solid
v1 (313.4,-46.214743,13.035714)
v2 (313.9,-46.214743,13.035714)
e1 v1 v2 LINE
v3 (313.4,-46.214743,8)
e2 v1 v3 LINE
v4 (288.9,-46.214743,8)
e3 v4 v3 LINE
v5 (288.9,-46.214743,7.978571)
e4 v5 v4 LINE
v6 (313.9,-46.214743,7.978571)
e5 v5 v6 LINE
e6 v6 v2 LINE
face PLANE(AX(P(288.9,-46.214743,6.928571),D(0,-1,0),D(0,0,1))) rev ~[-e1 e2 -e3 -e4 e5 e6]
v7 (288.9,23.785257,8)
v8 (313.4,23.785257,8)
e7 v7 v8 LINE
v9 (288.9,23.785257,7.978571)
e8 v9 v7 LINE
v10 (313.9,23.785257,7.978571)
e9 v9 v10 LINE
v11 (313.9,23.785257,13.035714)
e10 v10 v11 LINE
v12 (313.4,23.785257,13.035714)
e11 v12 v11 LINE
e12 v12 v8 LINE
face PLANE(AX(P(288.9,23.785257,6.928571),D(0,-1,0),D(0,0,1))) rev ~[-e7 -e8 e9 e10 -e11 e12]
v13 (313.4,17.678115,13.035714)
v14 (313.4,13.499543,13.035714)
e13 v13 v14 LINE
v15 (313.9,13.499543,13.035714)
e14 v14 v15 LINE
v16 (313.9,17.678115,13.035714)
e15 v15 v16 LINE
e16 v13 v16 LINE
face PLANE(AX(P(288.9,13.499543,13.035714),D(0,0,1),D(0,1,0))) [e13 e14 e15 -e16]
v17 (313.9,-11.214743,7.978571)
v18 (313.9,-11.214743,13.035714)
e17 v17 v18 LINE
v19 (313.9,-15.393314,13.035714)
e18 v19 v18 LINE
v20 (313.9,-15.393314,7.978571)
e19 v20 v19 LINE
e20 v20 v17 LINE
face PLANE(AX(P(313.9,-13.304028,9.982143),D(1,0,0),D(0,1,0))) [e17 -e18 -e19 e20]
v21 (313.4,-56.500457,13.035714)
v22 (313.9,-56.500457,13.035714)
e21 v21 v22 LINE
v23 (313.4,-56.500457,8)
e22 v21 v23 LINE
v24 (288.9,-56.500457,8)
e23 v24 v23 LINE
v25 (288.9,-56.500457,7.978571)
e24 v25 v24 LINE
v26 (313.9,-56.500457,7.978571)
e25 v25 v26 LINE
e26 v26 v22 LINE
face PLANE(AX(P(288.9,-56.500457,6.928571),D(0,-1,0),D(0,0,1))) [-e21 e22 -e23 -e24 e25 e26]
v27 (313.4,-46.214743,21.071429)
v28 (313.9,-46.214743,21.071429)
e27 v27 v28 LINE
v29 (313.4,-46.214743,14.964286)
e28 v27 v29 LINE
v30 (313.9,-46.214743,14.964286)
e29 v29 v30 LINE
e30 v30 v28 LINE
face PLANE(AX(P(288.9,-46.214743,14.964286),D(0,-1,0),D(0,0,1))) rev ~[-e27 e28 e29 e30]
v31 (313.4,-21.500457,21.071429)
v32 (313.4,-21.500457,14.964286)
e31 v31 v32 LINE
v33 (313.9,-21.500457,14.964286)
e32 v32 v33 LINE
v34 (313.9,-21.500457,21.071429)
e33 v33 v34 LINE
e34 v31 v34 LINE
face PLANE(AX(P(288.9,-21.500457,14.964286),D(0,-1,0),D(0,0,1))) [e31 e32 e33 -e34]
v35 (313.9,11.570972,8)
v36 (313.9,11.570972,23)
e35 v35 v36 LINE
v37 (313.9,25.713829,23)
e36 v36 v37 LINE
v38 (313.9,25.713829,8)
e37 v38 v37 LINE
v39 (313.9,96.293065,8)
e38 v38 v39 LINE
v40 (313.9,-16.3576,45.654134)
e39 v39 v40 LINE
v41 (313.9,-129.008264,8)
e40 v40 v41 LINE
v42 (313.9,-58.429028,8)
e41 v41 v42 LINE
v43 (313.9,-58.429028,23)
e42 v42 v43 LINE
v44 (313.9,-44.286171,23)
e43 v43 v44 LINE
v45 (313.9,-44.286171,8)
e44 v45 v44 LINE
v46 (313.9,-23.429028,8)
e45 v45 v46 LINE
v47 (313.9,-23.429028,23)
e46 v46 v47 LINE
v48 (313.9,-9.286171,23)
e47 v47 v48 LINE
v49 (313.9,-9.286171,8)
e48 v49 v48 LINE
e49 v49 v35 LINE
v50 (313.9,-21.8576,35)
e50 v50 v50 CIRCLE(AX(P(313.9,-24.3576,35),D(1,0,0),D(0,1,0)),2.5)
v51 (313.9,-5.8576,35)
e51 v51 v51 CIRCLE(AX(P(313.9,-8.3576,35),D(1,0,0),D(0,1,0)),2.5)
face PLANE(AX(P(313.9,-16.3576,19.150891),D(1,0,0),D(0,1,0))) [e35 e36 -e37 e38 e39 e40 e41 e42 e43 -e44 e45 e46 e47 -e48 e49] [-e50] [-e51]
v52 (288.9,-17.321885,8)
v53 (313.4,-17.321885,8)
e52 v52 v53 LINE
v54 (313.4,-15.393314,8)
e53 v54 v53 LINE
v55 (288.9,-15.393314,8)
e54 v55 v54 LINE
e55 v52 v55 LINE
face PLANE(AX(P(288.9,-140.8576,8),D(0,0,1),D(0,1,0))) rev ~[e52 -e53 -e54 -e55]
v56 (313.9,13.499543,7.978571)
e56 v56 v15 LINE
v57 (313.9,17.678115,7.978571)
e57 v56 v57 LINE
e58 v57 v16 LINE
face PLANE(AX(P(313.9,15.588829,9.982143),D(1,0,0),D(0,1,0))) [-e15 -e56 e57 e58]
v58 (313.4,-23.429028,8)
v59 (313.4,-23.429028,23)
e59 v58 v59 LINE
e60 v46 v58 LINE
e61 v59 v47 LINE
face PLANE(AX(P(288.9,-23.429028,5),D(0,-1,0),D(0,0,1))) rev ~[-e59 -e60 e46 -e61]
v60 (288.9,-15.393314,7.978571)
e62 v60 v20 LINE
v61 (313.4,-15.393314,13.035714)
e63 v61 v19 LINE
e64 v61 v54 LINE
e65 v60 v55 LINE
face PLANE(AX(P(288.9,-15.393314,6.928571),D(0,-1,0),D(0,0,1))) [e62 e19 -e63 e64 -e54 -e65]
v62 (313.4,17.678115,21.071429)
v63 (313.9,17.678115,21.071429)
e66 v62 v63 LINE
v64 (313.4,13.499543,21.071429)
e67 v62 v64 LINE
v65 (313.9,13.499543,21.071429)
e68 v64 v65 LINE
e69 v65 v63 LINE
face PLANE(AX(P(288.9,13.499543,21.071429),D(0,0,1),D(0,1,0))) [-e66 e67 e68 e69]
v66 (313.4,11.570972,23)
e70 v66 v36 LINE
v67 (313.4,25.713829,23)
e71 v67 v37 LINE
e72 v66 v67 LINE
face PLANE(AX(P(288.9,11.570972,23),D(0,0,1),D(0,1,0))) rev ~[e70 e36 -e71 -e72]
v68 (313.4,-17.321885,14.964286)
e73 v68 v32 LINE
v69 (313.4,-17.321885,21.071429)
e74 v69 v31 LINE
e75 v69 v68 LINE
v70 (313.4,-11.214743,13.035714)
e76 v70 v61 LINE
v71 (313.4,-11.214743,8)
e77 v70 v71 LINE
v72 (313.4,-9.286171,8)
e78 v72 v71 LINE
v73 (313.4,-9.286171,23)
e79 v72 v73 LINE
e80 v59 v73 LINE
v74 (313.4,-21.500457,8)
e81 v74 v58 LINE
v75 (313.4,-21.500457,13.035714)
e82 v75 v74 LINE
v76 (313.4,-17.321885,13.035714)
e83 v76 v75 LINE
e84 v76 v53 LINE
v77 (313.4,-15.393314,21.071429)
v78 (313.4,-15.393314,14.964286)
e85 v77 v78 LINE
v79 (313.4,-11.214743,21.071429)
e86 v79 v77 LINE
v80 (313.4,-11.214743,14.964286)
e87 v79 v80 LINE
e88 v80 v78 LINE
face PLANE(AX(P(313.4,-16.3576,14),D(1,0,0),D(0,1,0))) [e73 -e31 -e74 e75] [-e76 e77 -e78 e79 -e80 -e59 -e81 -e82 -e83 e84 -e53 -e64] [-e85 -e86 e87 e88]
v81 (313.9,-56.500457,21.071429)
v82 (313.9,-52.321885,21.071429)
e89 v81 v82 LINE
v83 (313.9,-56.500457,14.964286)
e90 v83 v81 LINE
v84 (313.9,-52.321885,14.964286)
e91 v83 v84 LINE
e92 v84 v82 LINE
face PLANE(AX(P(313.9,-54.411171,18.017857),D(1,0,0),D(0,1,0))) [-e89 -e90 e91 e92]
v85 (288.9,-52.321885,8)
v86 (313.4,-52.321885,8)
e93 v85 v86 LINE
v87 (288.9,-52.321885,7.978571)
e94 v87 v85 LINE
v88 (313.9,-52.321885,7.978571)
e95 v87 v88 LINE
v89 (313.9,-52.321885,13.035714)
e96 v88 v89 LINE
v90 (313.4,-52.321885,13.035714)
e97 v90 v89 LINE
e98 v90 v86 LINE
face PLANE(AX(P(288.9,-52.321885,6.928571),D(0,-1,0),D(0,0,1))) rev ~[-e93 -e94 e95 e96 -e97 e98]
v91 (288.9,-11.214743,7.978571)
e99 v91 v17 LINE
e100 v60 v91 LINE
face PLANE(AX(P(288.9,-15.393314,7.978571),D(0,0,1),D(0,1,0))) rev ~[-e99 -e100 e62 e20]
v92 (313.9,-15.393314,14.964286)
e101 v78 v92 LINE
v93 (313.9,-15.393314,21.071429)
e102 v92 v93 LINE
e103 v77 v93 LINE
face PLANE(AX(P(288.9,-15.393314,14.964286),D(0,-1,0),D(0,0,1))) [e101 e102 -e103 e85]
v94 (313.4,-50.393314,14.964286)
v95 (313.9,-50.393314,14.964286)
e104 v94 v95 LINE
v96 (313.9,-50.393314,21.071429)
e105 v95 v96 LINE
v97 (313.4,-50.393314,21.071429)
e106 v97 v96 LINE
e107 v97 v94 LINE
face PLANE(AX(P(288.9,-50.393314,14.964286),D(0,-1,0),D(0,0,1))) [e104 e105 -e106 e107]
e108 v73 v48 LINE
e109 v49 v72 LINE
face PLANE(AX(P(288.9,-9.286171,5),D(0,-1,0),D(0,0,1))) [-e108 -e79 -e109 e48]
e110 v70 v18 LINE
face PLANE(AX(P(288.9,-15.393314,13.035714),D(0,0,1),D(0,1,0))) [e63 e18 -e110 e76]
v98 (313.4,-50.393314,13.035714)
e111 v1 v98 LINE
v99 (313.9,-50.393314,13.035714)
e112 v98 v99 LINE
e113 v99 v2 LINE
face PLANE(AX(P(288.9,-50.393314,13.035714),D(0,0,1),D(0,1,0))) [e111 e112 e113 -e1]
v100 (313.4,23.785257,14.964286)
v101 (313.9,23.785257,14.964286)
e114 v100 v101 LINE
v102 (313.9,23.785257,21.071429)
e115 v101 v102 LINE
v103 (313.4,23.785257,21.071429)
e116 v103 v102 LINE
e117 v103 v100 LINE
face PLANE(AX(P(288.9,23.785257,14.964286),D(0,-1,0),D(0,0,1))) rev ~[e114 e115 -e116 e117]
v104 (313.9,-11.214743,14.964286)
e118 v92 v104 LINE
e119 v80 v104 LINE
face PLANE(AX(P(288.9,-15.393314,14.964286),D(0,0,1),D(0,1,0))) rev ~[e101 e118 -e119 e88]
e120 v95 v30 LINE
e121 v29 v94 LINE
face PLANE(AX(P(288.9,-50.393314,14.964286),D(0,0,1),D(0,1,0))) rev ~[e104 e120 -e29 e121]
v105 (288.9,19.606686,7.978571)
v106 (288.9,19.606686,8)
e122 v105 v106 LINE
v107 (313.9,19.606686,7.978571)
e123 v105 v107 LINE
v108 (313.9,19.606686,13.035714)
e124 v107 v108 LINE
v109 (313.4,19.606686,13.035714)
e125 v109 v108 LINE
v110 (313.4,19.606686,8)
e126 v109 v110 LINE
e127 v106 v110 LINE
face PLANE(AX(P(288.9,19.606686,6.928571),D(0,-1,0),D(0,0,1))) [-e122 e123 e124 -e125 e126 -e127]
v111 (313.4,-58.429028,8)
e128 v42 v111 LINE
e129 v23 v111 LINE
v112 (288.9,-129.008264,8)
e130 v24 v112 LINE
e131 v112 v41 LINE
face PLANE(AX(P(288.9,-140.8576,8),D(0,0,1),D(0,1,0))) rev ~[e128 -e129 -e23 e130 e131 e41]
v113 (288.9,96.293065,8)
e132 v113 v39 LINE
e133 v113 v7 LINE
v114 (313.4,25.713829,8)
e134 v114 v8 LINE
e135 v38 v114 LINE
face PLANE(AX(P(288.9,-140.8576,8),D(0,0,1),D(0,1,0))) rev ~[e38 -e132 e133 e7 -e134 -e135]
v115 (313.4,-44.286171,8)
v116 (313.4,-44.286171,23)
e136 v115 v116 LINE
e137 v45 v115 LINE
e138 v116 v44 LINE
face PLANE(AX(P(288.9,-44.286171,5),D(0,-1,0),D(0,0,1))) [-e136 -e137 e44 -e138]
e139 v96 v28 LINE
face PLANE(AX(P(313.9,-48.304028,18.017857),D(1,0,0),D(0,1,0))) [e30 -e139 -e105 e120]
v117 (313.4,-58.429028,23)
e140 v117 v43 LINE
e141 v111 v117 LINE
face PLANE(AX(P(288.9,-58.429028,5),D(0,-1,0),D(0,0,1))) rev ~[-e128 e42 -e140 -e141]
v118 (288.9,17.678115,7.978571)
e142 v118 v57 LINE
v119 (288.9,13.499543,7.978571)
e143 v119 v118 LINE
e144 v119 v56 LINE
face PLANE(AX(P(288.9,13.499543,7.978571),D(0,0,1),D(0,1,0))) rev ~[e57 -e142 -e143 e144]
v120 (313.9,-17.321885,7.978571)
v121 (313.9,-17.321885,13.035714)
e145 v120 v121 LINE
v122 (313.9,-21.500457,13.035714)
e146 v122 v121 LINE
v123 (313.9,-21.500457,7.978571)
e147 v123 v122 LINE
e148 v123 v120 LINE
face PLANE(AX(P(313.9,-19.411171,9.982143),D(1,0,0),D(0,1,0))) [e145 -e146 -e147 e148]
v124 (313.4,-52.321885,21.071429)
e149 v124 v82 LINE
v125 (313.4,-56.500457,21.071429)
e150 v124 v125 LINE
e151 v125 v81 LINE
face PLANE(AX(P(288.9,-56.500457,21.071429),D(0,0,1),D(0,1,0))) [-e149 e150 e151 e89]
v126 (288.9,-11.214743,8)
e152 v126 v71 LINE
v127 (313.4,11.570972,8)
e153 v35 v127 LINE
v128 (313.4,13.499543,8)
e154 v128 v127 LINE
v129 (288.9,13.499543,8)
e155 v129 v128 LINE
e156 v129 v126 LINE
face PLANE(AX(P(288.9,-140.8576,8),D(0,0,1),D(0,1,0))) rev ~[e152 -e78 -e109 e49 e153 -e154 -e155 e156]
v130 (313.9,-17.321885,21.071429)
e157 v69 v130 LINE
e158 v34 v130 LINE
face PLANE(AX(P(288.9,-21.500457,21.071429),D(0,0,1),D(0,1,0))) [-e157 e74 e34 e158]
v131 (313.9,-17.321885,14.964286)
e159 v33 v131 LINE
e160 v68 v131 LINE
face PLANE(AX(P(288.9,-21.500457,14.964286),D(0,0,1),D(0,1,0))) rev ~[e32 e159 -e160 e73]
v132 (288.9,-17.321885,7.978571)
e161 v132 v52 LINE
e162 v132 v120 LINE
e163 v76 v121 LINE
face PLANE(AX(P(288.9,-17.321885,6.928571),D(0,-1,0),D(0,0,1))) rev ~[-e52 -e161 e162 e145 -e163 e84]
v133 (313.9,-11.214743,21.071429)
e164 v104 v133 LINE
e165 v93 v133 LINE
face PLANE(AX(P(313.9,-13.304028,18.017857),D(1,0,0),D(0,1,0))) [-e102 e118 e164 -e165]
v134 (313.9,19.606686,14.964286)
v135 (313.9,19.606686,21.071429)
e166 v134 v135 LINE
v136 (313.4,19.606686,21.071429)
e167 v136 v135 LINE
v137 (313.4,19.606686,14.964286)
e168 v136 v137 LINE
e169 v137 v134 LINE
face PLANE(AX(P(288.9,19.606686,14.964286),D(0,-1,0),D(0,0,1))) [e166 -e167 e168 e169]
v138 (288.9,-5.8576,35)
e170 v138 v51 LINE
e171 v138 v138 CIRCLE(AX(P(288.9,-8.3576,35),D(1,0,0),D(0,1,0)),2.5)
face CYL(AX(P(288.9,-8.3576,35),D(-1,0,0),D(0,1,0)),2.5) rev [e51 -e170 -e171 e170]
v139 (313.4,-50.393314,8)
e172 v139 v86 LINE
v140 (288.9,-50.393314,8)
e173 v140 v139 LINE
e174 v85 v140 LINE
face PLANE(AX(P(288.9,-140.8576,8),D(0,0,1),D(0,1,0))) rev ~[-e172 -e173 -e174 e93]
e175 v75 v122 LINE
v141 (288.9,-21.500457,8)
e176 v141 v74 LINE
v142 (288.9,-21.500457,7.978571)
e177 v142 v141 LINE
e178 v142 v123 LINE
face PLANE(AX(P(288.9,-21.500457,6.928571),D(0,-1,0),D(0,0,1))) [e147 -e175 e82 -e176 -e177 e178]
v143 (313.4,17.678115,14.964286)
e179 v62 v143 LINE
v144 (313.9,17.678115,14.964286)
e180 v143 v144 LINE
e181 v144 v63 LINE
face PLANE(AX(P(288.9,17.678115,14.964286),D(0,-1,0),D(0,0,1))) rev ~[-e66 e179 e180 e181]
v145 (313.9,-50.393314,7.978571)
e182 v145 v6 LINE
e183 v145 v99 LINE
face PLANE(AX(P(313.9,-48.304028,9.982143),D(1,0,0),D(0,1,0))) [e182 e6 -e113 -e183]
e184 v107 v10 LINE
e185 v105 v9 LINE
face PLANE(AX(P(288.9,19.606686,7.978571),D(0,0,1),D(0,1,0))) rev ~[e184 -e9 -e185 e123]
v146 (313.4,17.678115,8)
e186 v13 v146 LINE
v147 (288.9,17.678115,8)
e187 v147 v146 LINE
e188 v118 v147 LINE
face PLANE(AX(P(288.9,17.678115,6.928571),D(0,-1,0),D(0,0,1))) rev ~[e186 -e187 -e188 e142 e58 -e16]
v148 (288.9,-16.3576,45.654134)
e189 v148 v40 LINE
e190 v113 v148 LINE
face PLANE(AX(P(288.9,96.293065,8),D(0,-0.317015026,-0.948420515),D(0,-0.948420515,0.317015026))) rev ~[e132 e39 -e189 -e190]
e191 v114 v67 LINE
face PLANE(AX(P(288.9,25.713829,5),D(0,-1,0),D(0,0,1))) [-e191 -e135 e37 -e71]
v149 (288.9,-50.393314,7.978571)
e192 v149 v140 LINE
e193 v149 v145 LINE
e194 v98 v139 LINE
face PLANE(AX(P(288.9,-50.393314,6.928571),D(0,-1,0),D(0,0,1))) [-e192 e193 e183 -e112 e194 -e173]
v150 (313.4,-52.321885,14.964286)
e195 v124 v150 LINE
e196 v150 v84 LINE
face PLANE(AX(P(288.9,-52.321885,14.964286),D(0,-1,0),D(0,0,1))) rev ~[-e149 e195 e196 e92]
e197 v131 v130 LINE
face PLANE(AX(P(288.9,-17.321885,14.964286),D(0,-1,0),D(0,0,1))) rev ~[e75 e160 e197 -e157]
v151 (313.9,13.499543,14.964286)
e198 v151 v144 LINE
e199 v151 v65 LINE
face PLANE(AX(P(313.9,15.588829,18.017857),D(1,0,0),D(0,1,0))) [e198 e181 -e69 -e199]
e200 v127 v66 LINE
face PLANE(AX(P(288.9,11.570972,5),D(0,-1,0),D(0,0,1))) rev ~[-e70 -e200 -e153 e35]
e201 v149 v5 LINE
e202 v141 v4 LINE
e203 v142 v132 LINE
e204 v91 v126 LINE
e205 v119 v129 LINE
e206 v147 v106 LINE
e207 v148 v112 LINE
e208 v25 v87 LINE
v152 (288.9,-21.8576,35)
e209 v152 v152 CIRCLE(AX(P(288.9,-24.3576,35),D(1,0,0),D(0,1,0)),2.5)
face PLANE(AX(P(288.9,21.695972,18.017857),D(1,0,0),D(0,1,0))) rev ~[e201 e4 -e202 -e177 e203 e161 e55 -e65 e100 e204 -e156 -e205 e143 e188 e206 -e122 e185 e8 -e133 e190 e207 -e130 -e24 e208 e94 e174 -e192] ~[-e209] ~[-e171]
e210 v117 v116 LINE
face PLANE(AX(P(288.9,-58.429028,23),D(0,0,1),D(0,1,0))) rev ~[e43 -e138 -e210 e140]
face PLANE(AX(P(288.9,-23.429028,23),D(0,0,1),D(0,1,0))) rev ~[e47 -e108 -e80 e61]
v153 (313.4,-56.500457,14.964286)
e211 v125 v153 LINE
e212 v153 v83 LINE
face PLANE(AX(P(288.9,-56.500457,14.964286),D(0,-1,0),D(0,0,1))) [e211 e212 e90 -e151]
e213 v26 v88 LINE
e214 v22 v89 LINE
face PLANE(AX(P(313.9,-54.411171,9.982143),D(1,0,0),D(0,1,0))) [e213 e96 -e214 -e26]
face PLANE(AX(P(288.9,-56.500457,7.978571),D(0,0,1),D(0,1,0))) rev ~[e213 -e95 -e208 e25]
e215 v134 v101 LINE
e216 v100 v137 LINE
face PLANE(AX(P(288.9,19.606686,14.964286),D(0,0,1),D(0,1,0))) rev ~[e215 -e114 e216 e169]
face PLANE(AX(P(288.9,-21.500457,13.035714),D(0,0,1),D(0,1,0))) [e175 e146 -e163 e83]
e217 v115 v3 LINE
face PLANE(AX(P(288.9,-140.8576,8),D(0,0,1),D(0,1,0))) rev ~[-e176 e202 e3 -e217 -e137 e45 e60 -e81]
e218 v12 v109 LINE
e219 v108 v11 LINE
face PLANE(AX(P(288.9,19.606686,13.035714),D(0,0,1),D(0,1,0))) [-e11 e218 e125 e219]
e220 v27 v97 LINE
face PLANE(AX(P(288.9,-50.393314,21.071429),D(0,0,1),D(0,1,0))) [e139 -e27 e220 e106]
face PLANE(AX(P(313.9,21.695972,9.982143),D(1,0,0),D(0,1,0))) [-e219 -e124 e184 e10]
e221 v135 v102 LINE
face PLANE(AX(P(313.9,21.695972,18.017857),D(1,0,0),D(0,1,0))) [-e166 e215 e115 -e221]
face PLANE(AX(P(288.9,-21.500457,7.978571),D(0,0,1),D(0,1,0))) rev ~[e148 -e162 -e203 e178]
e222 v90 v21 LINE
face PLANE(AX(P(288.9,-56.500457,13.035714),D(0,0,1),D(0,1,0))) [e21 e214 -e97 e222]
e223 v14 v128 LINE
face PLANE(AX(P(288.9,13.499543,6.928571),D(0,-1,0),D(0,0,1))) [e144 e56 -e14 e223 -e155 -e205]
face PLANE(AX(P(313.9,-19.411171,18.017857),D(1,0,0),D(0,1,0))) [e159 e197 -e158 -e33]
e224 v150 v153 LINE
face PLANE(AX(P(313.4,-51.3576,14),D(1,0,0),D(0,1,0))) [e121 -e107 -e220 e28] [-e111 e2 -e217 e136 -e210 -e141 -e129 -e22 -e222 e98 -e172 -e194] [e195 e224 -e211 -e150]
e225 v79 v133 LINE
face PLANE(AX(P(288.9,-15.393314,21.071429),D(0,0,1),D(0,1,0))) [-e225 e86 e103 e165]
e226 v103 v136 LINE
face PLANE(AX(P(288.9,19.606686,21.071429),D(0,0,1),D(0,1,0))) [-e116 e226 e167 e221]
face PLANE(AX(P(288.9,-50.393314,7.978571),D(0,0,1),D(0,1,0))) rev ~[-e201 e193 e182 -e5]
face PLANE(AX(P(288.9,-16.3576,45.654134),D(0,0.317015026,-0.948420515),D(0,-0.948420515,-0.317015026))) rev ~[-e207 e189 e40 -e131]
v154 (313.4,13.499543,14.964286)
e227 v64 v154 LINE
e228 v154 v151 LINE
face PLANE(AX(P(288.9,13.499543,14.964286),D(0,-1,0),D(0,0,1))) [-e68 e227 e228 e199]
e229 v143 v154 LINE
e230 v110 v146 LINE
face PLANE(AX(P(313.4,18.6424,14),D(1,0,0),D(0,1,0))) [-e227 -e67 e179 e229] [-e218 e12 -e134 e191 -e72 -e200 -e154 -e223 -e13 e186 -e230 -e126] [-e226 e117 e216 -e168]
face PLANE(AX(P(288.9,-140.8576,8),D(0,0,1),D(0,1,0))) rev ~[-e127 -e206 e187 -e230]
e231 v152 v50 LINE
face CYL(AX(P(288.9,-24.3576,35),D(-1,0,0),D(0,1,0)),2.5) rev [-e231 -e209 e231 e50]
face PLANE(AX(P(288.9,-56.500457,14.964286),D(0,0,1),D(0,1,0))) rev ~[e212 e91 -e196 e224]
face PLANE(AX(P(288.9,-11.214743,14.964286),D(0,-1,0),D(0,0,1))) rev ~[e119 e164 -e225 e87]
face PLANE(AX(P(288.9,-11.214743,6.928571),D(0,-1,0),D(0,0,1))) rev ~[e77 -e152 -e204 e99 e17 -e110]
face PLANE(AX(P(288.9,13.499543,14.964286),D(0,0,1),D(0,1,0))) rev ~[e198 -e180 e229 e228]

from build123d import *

# Parameters (mm, degrees)
F1_DEPTH  = 8
F3_DEPTH  = 621.7
F4_DEPTH  = 5.5
F7_DEPTH  = 5.5
F9_DEPTH  = 5.5
F11_DEPTH = 5.5
F13_DEPTH = 5.5
F15_DEPTH = 5.5
F17_DEPTH = 308.2
F18_DEPTH = 24
F20_DEPTH = 244.2
F21_DEPTH = 30.35
F22_R     = 2.5
F23_DEPTH = 0.5
F24_R     = 2.5
F25_DEPTH = 0.5
F26_R     = 2.5
F27_DEPTH = 0.5
F28_R     = 2.5
F29_DEPTH = 0.5
F30_W     = 14.1428571429
F30_H     = 18
F30_W_2   = 4.1785714286
F30_H_2   = 6.1071428571
F31_DEPTH = 0.5
F32_DEPTH = 25
F34_DEPTH = 8
F35_DEPTH = 0.5
F36_W     = 4.1785714286
F36_H     = 6.1071428571
F36_H_2   = 5.0357142857
F37_DEPTH = 24.5
F38_DEPTH = 25
F39_DEPTH = 1.05


# Not quite as in the source:
# - a feature of the source that left no trace in its solid (it failed there, or was rolled back) is left out


with BuildPart() as f1:
    # F0 (on Top) → F1 (new body)
    with BuildSketch(Plane.XY):
        Polygon((-327.3, 108.1424002851), (-327.3, -140.8575997149), (-102.6, -140.8575997149), (-102.6, -170.8575997149), (0, -170.8575997149), (0, -140.8575997149), (288.9, -140.8575997149), (288.9, 108.1424002851), (0, 108.1424002851), (0, 138.1424002851), (-102.6, 128.6424002851), (-102.6, 108.1424002851), align=None)
    extrude(amount=F1_DEPTH)

    # F2 (on face) → F3 (join)
    with BuildSketch(Plane.YZ.offset(288.9)):
        Polygon((-16.3575997149, 51.4532495908), (-146.3575997149, 8), (-140.8575997149, 8), (108.1424002851, 8), (113.6424002851, 8), align=None)
    extrude(amount=-F3_DEPTH)

    # F2 (on face) → F4 (join)
    with BuildSketch(Plane.YZ.offset(288.9)):
        Polygon((-16.3575997149, 51.4532495908), (-146.3575997149, 8), (113.6424002851, 8), align=None)
    extrude(amount=F4_DEPTH)

    # F5 (on face) → F7 (join)
    with BuildSketch(Plane.XZ.offset(170.8575997149)):
        Polygon((-51.3, 62.75), (-108.1, 8), (5.5, 8), align=None)
    extrude(amount=F7_DEPTH)

    # F8 (on face) → F9 (cut)
    with BuildSketch(Plane(origin=(-13.187163576, 142.4213666207, 0), x_dir=(-0.9957406741, -0.0921982106, 0), z_dir=(-0.0921982106, 0.9957406741, 0))):
        Polygon((91.8565413643, 4.3927081219), (38.2758658123, 55.8195932448), (-15.3048097397, 4.3927081219), align=None)
    extrude(amount=-F9_DEPTH, mode=Mode.SUBTRACT)

    # F10 (on face) → F11 (cut)
    with BuildSketch(Plane(origin=(-332.8, 0, 0), x_dir=(0, -1, 0), z_dir=(-1, 0, 0))):
        Polygon((144.6140170728, 2.7836871671), (16.3575997149, 45.6541342062), (-111.8988176431, 2.7836871671), align=None)
    extrude(amount=-F11_DEPTH, mode=Mode.SUBTRACT)

    # F12 (on face) → F13 (cut)
    with BuildSketch(Plane.YZ.offset(294.4)):
        Polygon((111.8988176431, 2.7836871671), (-16.3575997149, 45.6541342062), (-144.6140170728, 2.7836871671), align=None)
    extrude(amount=-F13_DEPTH, mode=Mode.SUBTRACT)

    # F14 (on face) → F15 (cut)
    with BuildSketch(Plane.XZ.offset(176.3575997149)):
        Polygon((1.6830285492, 4.0401099834), (-51.3, 55.1108989459), (-104.2830285492, 4.0401099834), align=None)
    extrude(amount=-F15_DEPTH, mode=Mode.SUBTRACT)

    # F16 (on face) → F17 (join)
    with BuildSketch(Plane.YZ.offset(294.4)):
        Polygon((-37.9123742622, 48.4659791319), (-36.6443145321, 44.6722981882), (-16.3575997149, 51.4532495908), (3.9291151024, 44.6722981882), (5.1971748325, 48.4659791319), (-16.3575997149, 55.670786811), align=None)
    extrude(amount=-F17_DEPTH)

    # F16 (on face) → F18 (cut)
    with BuildSketch(Plane.YZ.offset(294.4)):
        Polygon((-37.9123742622, 48.4659791319), (-36.6443145321, 44.6722981882), (-16.3575997149, 51.4532495908), (3.9291151024, 44.6722981882), (5.1971748325, 48.4659791319), (-16.3575997149, 55.670786811), align=None)
    extrude(amount=-F18_DEPTH, mode=Mode.SUBTRACT)

    # F19 (on face) → F20 (join)
    with BuildSketch(Plane(origin=(-332.8, 0, 0), x_dir=(0, -1, 0), z_dir=(-1, 0, 0))):
        Polygon((-5.1971748325, 48.4659791319), (-3.9291151024, 44.6722981882), (16.3575997149, 51.4532495908), (36.6443145321, 44.6722981882), (37.9123742622, 48.4659791319), (16.3575997149, 55.670786811), align=None)
    extrude(amount=-F20_DEPTH)

    # F19 (on face) → F21 (cut)
    with BuildSketch(Plane(origin=(-332.8, 0, 0), x_dir=(0, -1, 0), z_dir=(-1, 0, 0))):
        Polygon((-5.1971748325, 48.4659791319), (-3.9291151024, 44.6722981882), (16.3575997149, 51.4532495908), (36.6443145321, 44.6722981882), (37.9123742622, 48.4659791319), (16.3575997149, 55.670786811), align=None)
    extrude(amount=-F21_DEPTH, mode=Mode.SUBTRACT)

    # F22 (on face) → F23 (cut)
    with BuildSketch(Plane(origin=(-327.3, 0, 0), x_dir=(0, -1, 0), z_dir=(-1, 0, 0))):
        with Locations((8.3575997149, 35)):
            Circle(F22_R)
        with Locations((24.3575997149, 35)):
            Circle(F22_R)
    extrude(amount=-F23_DEPTH, mode=Mode.SUBTRACT)

    # F24 (on face) → F25 (cut)
    with BuildSketch(Plane.YZ.offset(288.9)):
        with Locations((-24.3575997149, 35)):
            Circle(F24_R)
        with Locations((-8.3575997149, 35)):
            Circle(F24_R)
    extrude(amount=-F25_DEPTH, mode=Mode.SUBTRACT)

    # F26 (on face) → F27 (cut)
    with BuildSketch(Plane.XZ.offset(170.8575997149)):
        with Locations((-59.3, 35)):
            Circle(F26_R)
        with Locations((-43.3, 35)):
            Circle(F26_R)
    extrude(amount=-F27_DEPTH, mode=Mode.SUBTRACT)

    # F28 (on face) → F29 (cut)
    with BuildSketch(Plane(origin=(-12.6822332802, 136.9681194259, 0), x_dir=(-0.9957406741, -0.0921982106, 0), z_dir=(-0.0921982106, 0.9957406741, 0))):
        with Locations((30.7829559704, 35)):
            Circle(F28_R)
        with Locations((46.7829559704, 35)):
            Circle(F28_R)
    extrude(amount=-F29_DEPTH, mode=Mode.SUBTRACT)

    # F30 (on face) → F31 (cut)
    with BuildSketch(Plane.YZ.offset(288.9)):
        with Locations((-16.3575997149, 14)):
            Rectangle(F30_W, F30_H)
        with Locations((-19.4111711434, 9.9821428571)):
            Rectangle(F30_W_2, F30_H_2, mode=Mode.SUBTRACT)
        with Locations((-13.3040282863, 9.9821428571)):
            Rectangle(F30_W_2, F30_H_2, mode=Mode.SUBTRACT)
        with Locations((-19.4111711434, 18.0178571429)):
            Rectangle(F30_W_2, F30_H_2, mode=Mode.SUBTRACT)
        with Locations((-13.3040282863, 18.0178571429)):
            Rectangle(F30_W_2, F30_H_2, mode=Mode.SUBTRACT)
        with Locations((18.6424002851, 14)):
            Rectangle(F30_W, F30_H)
        with Locations((15.5888288566, 9.9821428571)):
            Rectangle(F30_W_2, F30_H_2, mode=Mode.SUBTRACT)
        with Locations((21.6959717137, 9.9821428571)):
            Rectangle(F30_W_2, F30_H_2, mode=Mode.SUBTRACT)
        with Locations((15.5888288566, 18.0178571429)):
            Rectangle(F30_W_2, F30_H_2, mode=Mode.SUBTRACT)
        with Locations((21.6959717137, 18.0178571429)):
            Rectangle(F30_W_2, F30_H_2, mode=Mode.SUBTRACT)
        with Locations((-51.3575997149, 14)):
            Rectangle(F30_W, F30_H)
        with Locations((-54.4111711434, 9.9821428571)):
            Rectangle(F30_W_2, F30_H_2, mode=Mode.SUBTRACT)
        with Locations((-48.3040282863, 9.9821428571)):
            Rectangle(F30_W_2, F30_H_2, mode=Mode.SUBTRACT)
        with Locations((-54.4111711434, 18.0178571429)):
            Rectangle(F30_W_2, F30_H_2, mode=Mode.SUBTRACT)
        with Locations((-48.3040282863, 18.0178571429)):
            Rectangle(F30_W_2, F30_H_2, mode=Mode.SUBTRACT)
    extrude(amount=-F31_DEPTH, mode=Mode.SUBTRACT)


with BuildPart() as f32:
    # F32 (new): faces of the model
    f32_faces = [f1.part.faces().sort_by_distance(p)[0] for p in [
        (288.9, -16.3575997149, 2.5315074555),
        (288.4, -51.3575997149, 14),
        (288.4, -16.3575997149, 14),
        (288.4, 18.6424002851, 14),
    ]]
    extrude(f32_faces, amount=F32_DEPTH)

    # F34 (cut): a face of the model
    f34_faces = [f32.faces().sort_by_distance(p)[0] for p in [
        (301.4, -16.3575997149, 0),
    ]]
    extrude(f34_faces, amount=-F34_DEPTH, mode=Mode.SUBTRACT)

    # F35 (cut): faces of the model
    f35_faces = [f32.faces().sort_by_distance(p)[0] for p in [
        (288.4, 18.6424002851, 14),
        (288.4, -16.3575997149, 14),
        (288.4, -51.3575997149, 14),
    ]]
    extrude(f35_faces, amount=-F35_DEPTH, mode=Mode.SUBTRACT)

    # F36 (on face) → F37 (join)
    with BuildSketch(Plane(origin=(288.9, 0, 0), x_dir=(0, -1, 0), z_dir=(-1, 0, 0))):
        Polygon((61.9918890297, 25.6764385849), (-32.9998731613, 25.6764385849), (-32.9998731613, 8), (-23.785257428, 8), (-23.785257428, 13.0357142857), (-19.6066859994, 13.0357142857), (-19.6066859994, 8), (-17.6781145709, 8), (-17.6781145709, 13.0357142857), (-13.4995431423, 13.0357142857), (-13.4995431423, 8), (11.214742572, 8), (11.214742572, 13.0357142857), (15.3933140006, 13.0357142857), (15.3933140006, 8), (17.3218854291, 8), (17.3218854291, 13.0357142857), (21.5004568577, 13.0357142857), (21.5004568577, 8), (46.214742572, 8), (46.214742572, 13.0357142857), (50.3933140006, 13.0357142857), (50.3933140006, 8), (52.3218854291, 8), (52.3218854291, 13.0357142857), (56.5004568577, 13.0357142857), (56.5004568577, 8), (61.9918890297, 8), align=None)
        with Locations((-21.6959717137, 18.0178571429)):
            Rectangle(F36_W, F36_H, mode=Mode.SUBTRACT)
        with Locations((-15.5888288566, 18.0178571429)):
            Rectangle(F36_W, F36_H, mode=Mode.SUBTRACT)
        with Locations((13.3040282863, 18.0178571429)):
            Rectangle(F36_W, F36_H, mode=Mode.SUBTRACT)
        with Locations((19.4111711434, 18.0178571429)):
            Rectangle(F36_W, F36_H, mode=Mode.SUBTRACT)
        with Locations((48.3040282863, 18.0178571429)):
            Rectangle(F36_W, F36_H, mode=Mode.SUBTRACT)
        with Locations((54.4111711434, 18.0178571429)):
            Rectangle(F36_W, F36_H, mode=Mode.SUBTRACT)
        with Locations((-21.6959717137, 18.0178571429)):
            Rectangle(F36_W, F36_H)
        with Locations((-15.5888288566, 18.0178571429)):
            Rectangle(F36_W, F36_H)
        with Locations((-15.5888288566, 10.5178571429)):
            Rectangle(F36_W, F36_H_2)
        with Locations((-21.6959717137, 10.5178571429)):
            Rectangle(F36_W, F36_H_2)
        with Locations((13.3040282863, 18.0178571429)):
            Rectangle(F36_W, F36_H)
        with Locations((19.4111711434, 18.0178571429)):
            Rectangle(F36_W, F36_H)
        with Locations((19.4111711434, 10.5178571429)):
            Rectangle(F36_W, F36_H_2)
        with Locations((13.3040282863, 10.5178571429)):
            Rectangle(F36_W, F36_H_2)
        with Locations((48.3040282863, 18.0178571429)):
            Rectangle(F36_W, F36_H)
        with Locations((54.4111711434, 18.0178571429)):
            Rectangle(F36_W, F36_H)
        with Locations((54.4111711434, 10.5178571429)):
            Rectangle(F36_W, F36_H_2)
        with Locations((48.3040282863, 10.5178571429)):
            Rectangle(F36_W, F36_H_2)
    extrude(amount=-F37_DEPTH)

    # F30 (on face) → F38 (join)
    with BuildSketch(Plane.YZ.offset(288.9)):
        with Locations((21.6959717137, 18.0178571429)):
            Rectangle(F30_W_2, F30_H_2)
        with Locations((15.5888288566, 18.0178571429)):
            Rectangle(F30_W_2, F30_H_2)
        with Locations((15.5888288566, 9.9821428571)):
            Rectangle(F30_W_2, F30_H_2)
        with Locations((21.6959717137, 9.9821428571)):
            Rectangle(F30_W_2, F30_H_2)
        with Locations((-13.3040282863, 18.0178571429)):
            Rectangle(F30_W_2, F30_H_2)
        with Locations((-13.3040282863, 9.9821428571)):
            Rectangle(F30_W_2, F30_H_2)
        with Locations((-19.4111711434, 9.9821428571)):
            Rectangle(F30_W_2, F30_H_2)
        with Locations((-19.4111711434, 18.0178571429)):
            Rectangle(F30_W_2, F30_H_2)
        with Locations((-48.3040282863, 18.0178571429)):
            Rectangle(F30_W_2, F30_H_2)
        with Locations((-54.4111711434, 18.0178571429)):
            Rectangle(F30_W_2, F30_H_2)
        with Locations((-54.4111711434, 9.9821428571)):
            Rectangle(F30_W_2, F30_H_2)
        with Locations((-48.3040282863, 9.9821428571)):
            Rectangle(F30_W_2, F30_H_2)
    extrude(amount=F38_DEPTH)

    # F39 (cut): faces of the model
    f39_faces = [f32.faces().sort_by_distance(p)[0] for p in [
        (301.4, -54.4111711434, 6.9285714286),
        (301.4, -48.3040282863, 6.9285714286),
        (301.4, -19.4111711434, 6.9285714286),
        (301.4, -13.3040282863, 6.9285714286),
        (301.4, 15.5888288566, 6.9285714286),
        (301.4, 21.6959717137, 6.9285714286),
    ]]
    extrude(f39_faces, amount=-F39_DEPTH, mode=Mode.SUBTRACT)


solid = f32.part
